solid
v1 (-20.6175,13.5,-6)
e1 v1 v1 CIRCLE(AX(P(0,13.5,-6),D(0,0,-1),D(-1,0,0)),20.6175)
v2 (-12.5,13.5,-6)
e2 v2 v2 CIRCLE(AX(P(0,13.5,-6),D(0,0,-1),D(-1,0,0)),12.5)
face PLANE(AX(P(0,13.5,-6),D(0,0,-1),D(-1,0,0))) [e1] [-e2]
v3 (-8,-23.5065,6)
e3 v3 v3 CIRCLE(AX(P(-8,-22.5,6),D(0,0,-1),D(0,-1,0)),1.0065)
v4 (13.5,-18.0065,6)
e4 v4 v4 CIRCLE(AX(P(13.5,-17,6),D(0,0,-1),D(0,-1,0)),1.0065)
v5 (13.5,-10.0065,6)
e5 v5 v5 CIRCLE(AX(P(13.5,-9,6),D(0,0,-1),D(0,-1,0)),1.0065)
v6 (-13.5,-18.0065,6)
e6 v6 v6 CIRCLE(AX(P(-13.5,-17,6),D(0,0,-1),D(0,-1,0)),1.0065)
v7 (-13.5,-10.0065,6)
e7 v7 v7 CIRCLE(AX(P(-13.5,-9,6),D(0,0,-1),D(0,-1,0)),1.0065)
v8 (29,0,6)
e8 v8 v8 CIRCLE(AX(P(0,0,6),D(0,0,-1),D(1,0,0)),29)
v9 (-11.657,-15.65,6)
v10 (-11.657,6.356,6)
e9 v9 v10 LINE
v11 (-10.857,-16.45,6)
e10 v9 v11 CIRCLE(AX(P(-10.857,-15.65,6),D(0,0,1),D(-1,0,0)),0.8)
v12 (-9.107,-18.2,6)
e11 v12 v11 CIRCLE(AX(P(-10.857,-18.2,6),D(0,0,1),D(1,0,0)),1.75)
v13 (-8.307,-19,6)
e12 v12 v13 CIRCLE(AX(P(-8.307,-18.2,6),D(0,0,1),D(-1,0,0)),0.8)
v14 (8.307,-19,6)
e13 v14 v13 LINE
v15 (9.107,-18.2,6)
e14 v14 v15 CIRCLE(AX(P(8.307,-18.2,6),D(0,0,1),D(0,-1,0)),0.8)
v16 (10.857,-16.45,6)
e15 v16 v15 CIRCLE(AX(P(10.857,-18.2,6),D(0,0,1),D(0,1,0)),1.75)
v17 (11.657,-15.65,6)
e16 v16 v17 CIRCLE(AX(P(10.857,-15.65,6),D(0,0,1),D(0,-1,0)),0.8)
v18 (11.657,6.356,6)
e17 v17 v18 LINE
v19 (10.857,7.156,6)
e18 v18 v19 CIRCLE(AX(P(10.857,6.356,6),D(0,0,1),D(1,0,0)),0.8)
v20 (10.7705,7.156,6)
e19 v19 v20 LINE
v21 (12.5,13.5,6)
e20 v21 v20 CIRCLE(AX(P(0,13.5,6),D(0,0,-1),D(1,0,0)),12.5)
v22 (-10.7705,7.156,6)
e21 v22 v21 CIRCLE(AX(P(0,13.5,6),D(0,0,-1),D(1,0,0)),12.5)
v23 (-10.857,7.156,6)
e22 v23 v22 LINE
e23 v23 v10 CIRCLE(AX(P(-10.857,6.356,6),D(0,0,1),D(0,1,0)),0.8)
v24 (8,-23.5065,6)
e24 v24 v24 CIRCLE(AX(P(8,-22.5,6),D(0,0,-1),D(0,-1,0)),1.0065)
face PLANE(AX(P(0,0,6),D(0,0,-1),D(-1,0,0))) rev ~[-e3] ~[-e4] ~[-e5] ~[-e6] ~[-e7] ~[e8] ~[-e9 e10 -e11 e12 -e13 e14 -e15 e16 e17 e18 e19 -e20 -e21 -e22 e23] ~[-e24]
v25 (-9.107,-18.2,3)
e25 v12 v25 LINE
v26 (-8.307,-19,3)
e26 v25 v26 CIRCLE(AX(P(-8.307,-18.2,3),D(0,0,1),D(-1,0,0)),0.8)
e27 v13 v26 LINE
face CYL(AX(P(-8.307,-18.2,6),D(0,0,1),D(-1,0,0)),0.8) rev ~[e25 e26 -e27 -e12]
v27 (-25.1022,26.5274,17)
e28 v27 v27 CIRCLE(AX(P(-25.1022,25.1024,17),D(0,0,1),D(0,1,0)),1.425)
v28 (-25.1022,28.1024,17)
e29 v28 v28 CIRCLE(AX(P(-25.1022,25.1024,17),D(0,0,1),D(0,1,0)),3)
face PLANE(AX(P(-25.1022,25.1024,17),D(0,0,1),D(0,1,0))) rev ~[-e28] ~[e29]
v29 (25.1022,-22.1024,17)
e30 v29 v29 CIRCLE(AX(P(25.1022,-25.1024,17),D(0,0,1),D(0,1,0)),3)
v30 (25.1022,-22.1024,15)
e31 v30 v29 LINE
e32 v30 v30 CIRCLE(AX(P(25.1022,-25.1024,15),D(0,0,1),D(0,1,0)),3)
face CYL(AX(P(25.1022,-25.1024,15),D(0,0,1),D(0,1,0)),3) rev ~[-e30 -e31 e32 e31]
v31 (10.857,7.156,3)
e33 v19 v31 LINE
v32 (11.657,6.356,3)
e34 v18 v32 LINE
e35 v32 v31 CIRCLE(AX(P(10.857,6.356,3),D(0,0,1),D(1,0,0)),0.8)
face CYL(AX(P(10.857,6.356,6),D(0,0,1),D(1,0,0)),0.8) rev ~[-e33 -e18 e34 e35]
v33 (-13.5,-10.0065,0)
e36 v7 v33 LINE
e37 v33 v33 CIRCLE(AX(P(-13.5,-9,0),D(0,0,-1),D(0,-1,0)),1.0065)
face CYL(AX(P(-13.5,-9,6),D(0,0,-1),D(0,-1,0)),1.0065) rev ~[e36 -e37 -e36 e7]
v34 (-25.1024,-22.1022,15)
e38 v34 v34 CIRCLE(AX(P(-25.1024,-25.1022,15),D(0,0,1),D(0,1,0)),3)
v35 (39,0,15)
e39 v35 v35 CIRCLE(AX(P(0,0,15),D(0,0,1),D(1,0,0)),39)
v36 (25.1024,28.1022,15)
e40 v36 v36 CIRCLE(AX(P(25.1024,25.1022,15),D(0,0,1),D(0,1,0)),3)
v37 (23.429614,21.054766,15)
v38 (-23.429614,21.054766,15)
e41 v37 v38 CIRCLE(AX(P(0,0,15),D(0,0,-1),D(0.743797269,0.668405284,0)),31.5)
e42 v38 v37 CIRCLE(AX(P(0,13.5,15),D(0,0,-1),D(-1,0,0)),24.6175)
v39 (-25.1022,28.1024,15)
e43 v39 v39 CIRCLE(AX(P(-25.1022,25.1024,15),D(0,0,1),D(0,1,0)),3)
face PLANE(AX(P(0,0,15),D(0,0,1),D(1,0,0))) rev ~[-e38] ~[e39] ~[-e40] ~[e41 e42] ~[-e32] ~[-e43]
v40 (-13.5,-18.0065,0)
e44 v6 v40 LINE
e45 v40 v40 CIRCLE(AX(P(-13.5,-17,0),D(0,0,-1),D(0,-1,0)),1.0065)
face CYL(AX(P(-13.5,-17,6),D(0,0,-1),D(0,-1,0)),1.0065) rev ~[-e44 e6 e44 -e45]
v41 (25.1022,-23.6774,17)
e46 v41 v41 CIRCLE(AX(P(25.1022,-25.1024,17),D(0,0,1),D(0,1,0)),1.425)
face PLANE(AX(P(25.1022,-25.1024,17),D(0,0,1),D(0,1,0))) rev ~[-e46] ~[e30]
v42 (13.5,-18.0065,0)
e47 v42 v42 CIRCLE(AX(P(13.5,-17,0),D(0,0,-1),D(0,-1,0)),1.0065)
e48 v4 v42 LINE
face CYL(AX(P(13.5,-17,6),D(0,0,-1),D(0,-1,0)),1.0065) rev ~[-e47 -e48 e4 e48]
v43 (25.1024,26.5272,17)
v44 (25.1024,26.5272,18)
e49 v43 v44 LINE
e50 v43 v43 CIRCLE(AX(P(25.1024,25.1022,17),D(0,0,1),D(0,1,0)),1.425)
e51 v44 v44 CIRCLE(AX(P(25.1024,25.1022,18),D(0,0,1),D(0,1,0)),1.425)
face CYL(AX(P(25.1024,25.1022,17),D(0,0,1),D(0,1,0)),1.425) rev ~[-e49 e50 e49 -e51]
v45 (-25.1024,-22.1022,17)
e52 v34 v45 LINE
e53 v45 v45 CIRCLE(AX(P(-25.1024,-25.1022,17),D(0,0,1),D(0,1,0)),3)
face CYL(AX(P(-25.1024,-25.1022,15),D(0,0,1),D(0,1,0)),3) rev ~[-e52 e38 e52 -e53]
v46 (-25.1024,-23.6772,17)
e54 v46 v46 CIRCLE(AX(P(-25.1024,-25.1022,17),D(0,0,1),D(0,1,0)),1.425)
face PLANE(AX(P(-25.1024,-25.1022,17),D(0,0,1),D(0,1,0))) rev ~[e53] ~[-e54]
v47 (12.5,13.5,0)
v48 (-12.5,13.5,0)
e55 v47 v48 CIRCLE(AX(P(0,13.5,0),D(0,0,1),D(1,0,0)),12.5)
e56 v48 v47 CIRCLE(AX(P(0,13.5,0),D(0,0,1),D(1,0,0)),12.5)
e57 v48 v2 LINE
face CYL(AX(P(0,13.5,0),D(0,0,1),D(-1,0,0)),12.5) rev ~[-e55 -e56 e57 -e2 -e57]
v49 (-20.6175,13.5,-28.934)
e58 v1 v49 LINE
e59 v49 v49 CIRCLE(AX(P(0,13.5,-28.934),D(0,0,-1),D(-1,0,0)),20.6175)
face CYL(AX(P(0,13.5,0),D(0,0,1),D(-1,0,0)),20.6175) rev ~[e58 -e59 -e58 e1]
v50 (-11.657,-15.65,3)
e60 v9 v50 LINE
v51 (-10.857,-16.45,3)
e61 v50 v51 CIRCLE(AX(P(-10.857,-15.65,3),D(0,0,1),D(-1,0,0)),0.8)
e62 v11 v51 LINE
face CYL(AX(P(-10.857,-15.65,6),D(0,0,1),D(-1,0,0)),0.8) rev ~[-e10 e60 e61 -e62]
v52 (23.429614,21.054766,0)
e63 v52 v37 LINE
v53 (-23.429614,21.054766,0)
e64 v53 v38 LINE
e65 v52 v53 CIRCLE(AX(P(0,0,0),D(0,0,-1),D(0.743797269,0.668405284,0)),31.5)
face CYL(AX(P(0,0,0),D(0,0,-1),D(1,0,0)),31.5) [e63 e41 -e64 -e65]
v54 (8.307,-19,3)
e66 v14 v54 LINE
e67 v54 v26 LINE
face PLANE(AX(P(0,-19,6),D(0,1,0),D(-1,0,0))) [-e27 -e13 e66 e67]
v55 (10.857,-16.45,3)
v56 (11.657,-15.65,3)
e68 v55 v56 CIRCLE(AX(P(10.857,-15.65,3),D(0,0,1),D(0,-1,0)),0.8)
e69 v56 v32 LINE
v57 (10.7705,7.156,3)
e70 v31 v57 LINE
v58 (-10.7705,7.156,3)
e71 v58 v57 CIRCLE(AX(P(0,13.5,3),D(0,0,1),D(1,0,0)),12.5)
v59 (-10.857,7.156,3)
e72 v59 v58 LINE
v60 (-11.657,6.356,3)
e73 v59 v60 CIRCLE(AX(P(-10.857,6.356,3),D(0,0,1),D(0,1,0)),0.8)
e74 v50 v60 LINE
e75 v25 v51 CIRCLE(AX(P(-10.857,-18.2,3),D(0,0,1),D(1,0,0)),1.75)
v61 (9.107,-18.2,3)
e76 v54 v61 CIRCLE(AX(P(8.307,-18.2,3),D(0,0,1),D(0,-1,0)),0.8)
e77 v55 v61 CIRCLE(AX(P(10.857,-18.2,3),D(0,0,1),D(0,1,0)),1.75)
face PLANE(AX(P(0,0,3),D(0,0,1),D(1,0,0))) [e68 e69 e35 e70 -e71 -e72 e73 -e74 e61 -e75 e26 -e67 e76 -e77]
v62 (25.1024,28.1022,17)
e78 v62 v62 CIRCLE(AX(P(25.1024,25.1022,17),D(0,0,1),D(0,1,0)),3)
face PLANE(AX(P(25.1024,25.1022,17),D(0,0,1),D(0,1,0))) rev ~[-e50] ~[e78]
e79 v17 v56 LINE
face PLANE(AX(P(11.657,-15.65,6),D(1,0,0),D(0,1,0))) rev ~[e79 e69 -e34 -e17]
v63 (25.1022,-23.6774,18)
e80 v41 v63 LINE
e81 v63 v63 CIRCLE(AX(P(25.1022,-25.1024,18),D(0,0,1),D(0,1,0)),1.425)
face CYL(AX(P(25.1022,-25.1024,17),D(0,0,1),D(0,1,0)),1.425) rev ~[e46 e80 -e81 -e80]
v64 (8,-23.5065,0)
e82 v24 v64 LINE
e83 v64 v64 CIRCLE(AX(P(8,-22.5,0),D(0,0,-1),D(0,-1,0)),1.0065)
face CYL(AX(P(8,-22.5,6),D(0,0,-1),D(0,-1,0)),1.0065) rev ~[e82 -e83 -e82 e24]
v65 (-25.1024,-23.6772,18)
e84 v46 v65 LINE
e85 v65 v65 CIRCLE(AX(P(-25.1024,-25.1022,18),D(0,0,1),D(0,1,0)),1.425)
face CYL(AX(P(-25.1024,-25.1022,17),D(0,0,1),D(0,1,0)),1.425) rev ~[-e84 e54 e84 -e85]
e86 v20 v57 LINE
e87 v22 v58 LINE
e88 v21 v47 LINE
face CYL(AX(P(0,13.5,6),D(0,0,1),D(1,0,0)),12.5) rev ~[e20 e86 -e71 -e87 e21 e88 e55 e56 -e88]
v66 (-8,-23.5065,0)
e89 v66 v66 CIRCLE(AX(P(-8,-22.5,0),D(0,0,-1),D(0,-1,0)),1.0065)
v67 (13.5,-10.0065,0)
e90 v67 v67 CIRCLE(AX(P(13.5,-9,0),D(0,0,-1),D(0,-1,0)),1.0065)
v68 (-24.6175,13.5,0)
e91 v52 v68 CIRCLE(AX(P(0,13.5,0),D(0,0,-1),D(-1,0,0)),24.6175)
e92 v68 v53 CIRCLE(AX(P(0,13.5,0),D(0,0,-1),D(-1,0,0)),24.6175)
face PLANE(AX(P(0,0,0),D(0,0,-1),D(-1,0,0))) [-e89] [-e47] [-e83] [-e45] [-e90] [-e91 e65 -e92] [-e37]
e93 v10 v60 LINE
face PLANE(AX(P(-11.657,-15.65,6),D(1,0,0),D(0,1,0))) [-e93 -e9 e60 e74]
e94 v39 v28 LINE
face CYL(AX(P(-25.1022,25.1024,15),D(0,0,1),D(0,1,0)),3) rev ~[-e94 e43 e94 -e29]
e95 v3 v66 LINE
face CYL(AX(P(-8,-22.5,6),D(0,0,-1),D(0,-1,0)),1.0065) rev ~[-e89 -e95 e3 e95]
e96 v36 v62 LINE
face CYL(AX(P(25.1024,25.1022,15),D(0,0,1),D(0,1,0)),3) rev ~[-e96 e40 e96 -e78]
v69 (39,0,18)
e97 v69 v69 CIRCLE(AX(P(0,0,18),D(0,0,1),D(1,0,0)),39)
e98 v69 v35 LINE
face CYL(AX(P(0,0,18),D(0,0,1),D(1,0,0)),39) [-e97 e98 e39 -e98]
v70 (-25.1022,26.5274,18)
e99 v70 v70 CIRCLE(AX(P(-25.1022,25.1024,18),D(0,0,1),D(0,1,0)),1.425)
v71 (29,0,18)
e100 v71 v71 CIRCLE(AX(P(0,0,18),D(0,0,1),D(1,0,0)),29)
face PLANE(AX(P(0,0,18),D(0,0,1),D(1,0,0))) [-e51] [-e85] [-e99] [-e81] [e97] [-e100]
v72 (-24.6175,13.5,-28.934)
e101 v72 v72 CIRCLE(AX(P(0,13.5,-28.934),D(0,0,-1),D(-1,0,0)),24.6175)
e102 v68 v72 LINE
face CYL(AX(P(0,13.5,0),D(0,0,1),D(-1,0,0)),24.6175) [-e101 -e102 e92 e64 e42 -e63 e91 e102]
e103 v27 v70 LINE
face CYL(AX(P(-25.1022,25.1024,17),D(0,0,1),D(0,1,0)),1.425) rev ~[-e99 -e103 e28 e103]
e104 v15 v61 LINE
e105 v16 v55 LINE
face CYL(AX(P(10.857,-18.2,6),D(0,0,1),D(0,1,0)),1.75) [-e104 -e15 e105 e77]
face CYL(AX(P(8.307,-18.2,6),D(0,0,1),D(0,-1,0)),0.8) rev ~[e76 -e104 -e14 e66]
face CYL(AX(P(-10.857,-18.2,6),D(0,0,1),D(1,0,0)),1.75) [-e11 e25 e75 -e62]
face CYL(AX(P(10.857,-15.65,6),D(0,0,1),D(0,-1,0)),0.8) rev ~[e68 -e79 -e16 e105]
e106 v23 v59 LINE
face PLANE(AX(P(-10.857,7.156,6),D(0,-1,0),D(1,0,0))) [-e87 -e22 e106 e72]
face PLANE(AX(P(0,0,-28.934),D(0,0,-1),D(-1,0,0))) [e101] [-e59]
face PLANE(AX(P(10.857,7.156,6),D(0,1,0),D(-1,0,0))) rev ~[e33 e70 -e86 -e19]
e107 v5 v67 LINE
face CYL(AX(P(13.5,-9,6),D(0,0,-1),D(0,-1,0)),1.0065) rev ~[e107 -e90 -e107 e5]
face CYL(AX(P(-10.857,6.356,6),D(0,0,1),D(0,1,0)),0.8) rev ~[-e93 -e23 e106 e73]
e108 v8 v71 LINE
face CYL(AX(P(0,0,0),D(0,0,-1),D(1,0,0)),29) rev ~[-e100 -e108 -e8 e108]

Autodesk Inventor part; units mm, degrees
ref_plane "YZ Plane" through (0, 0, 0) normal (1, 0, 0) x (0, 1, 0)
ref_plane "XZ Plane" through (0, 0, 0) normal (0, 1, 0) x (-1, 0, 0)
ref_plane "XY Plane" through (0, 0, 0) normal (0, 0, 1) x (1, 0, 0)
sketch "Boceto1" plane through (0, 0, 0) normal (0, 0, 1) x (1, 0, 0)
  circle A0 centre (0, 0) radius 39
  circle A1 centre (0, 0) radius 29
  circle A2 centre (0, 0) radius 31.5
  dimension "DiametroExterior" = 78
  dimension "DiametroCaja" = 58
  dimension "d2" = 63
extrude "Extrusión1" add sketch "Boceto1" along normal blind 18 contours A2
sketch "Boceto2" plane through (0, 0, 18) normal (0, 0, 1) x (1, 0, 0)
  circle A0 centre (0, 0) radius 39
  circle A1 centre (0, 0) radius 31
  dimension "d5" = 78
  dimension "d6" = 62
extrude "Extrusión2" add sketch "Boceto2" against normal blind 3
sketch "Boceto3" plane through (0, 0, 0) normal (0, 0, -1) x (-1, 0, 0)
  circle A0 centre (0, 0) radius 29
  dimension "d9" = 58
extrude "Extrusión3" add sketch "Boceto3" against normal blind 6
sketch "Boceto5" plane through (0, 0, 15) normal (0, 0, -1) x (-1, 0, 0)
  line L0 (0, 0) -> (33, 0) construction
  line L1 (0, 0) -> (33.75, 0) construction
  circle A0 centre (0, 0) radius 39
  circle A1 centre (0, 0) radius 31.5
  circle A2 centre (25.1022, 25.1024) radius 2
  circle A3 centre (25.1024, -25.1022) radius 2
  circle A4 centre (-25.1022, -25.1024) radius 2
  circle A5 centre (-25.1024, 25.1022) radius 2
  point P0 (23.8649, 23.8649)
  dimension "d14" = 33.75
  dimension "d81" = 78
  dimension "d82" = 63
  dimension "d83" = 4
  dimension "d84" = 2
  dimension "d85" = 1.5
  dimension "d86" = 360
sketch "Boceto6" plane through (0, 0, 6) normal (0, 0, 1) x (1, 0, 0)
  line L0 (-16, -25) -> (16, -25)
  line L1 (16, -25) -> (16, 25)
  line L2 (16, 25) -> (-16, 25)
  line L3 (-16, 25) -> (-16, -25)
  line L4 (-16, -25) -> (16, 25) construction
  line L5 (16, -25) -> (-16, 25) construction
  circle A0 centre (0, 13.5) radius 12.5
  circle A1 centre (-8, -22.5) radius 1.1
  circle A2 centre (8, -22.5) radius 1.1
  circle A3 centre (13.5, -17) radius 1.1
  circle A4 centre (-13.5, -17) radius 1.1
  circle A5 centre (-13.5, -9) radius 1.1
  circle A6 centre (-13.5, -1) radius 1.1
  circle A7 centre (-13.5, 7) radius 1.1
  circle A8 centre (13.5, 7) radius 1.1
  circle A9 centre (13.5, -1) radius 1.1
  circle A10 centre (13.5, -9) radius 1.1
  line L6 (0, -25) -> (0, -19)
  line L7 (0, -19) -> (-8.307, -19)
  line L8 (0, -19) -> (8.307, -19)
  line L9 (-11.657, -15.65) -> (-11.657, 6.356)
  line L10 (11.657, -15.65) -> (11.657, 6.356)
  line L11 (10.857, 7.156) -> (9.815, 7.156)
  line L12 (-10.857, 7.156) -> (-9.815, 7.156)
  arc A11 (-9.015, 6.356) -> (9.015, 6.356) centre (0, 13.002) ccw
  arc A12 (9.815, 7.156) -> (9.015, 6.356) centre (9.815, 6.356) ccw
  arc A13 (11.657, 6.356) -> (10.857, 7.156) centre (10.857, 6.356) ccw
  arc A14 (-9.015, 6.356) -> (-9.815, 7.156) centre (-9.815, 6.356) ccw
  arc A15 (-10.857, 7.156) -> (-11.657, 6.356) centre (-10.857, 6.356) ccw
  arc A16 (10.857, -16.45) -> (11.657, -15.65) centre (10.857, -15.65) ccw
  arc A17 (10.857, -16.45) -> (9.107, -18.2) centre (10.857, -18.2) ccw
  arc A18 (8.307, -19) -> (9.107, -18.2) centre (8.307, -18.2) ccw
  arc A19 (-9.107, -18.2) -> (-8.307, -19) centre (-8.307, -18.2) ccw
  arc A20 (-9.107, -18.2) -> (-10.857, -16.45) centre (-10.857, -18.2) ccw
  arc A21 (-11.657, -15.65) -> (-10.857, -16.45) centre (-10.857, -15.65) ccw
  point P0 (0, 0)
  point P1 (0, 0)
  point P2 (10.7705, 7.156)
  point P3 (-10.7705, 7.156)
  point P4 (4.899, 25)
  point P5 (-4.899, 25)
  dimension "d27" = 32
  dimension "d28" = 50
  dimension "d29" = 25
  dimension "d30" = 11.5
  dimension "d31" = 2.2
  dimension "d32" = 2.2
  dimension "d33" = 2.2
  dimension "d34" = 2.2
  dimension "d35" = 2.2
  dimension "d36" = 2.2
  dimension "d37" = 2.2
  dimension "d38" = 2.2
  dimension "d39" = 2.2
  dimension "d40" = 2.2
  dimension "d41" = 27
  dimension "d42" = 16
  dimension "d43" = 36
  dimension "d44" = 30.5
  dimension "d45" = 6.5
  dimension "d46" = 8
  dimension "d47" = 8
  dimension "d48" = 8
  dimension "d49" = 8
  dimension "d50" = 8
  dimension "d51" = 8
  dimension "d52" = 6
  dimension "d53" = 8.307
  dimension "d54" = 22.006
  dimension "d55" = 1.042
  dimension "d56" = 1.042
  dimension "d57" = 11.2
  dimension "d58" = 0.8
  dimension "d59" = 0.8
  dimension "d60" = 0.8
  dimension "d61" = 0.8
  dimension "d62" = 1.75
  dimension "d63" = 0.8
  dimension "d64" = 1.75
  dimension "d65" = 0.8
extrude "Extrusión4" cut sketch "Boceto6" against normal blind 3 contours L7 A19 A20 A21 L9 A15 L12 A0 L11 A13 L10 A16 A17 A18 L8
hole "Agujero2" at (13.5, -17, 6) at (13.5, -9, 6) at (8, -22.5, 6) at (-8, -22.5, 6) at (-13.5, -9, 6) at (-13.5, -17, 6) direction (0, 0, -1) diameter 2.013 depth 7.6 thread size "M2.5x0.45" class "6H" standard "ISO Metric profile"
extrude "Extrusión6" cut sketch "Boceto6" against normal blind 6 contours A0 L2 | L2 A0 L11 A12 A11 A14 L12 | L12 A14 A11 A12 L11 A0
hole "Agujero3" at (-25.1022, 25.1024, 15) at (25.1024, 25.1022, 15) at (25.1022, -25.1024, 15) at (-25.1024, -25.1022, 15) direction (0, 0, 1) diameter 2.85 depth 10.4 counterbore diameter 6 counterbore depth 2 thread size "M3.5x0.6" class "6H" standard "ISO Metric profile"
sketch "Boceto7" plane through (0, 0, 0) normal (0, 0, -1) x (-1, 0, 0)
  arc A0 (-10.7705, 7.156) -> (10.7705, 7.156) centre (0, 13.5) ccw projected
  line L0 (0, 26) -> (0, 13.5)
  circle A1 centre (0, 13.5) radius 20.6175
  circle A2 centre (0, 13.5) radius 24.6175
  point P0 (0, 0)
  dimension "DiametroRodamiento" = 41.235
  dimension "d97" = 49.235
extrude "Extrusión7" add sketch "Boceto7" along normal blind 28.934
sketch "Boceto8" plane through (0, 0, 0) normal (0, 0, -1) x (-1, 0, 0)
  circle A0 centre (0, 0) radius 31.5 projected
  circle A1 centre (0, 0) radius 31.5
  circle A2 centre (0, 13.5) radius 24.6175
  circle A3 centre (0, 13.5) radius 20.6175
  point P0 (23.4296, 21.0548)
  point P1 (-23.4296, 21.0548)
extrude "Extrusión8" add sketch "Boceto8" against normal blind 15 contours A0 A3 A2 | A0 A3 picked at (0.7908, 36.6312) picked at (3.3504, 32.0101)
sketch "Boceto9" plane through (0, 13.5, 0) normal (0, 0, -1) x (-1, 0, 0)
  circle A0 centre (0, 0) radius 12.5
  circle A1 centre (0, 0) radius 20.6175
  point P0 (0, -13.5)
extrude "Extrusión9" add sketch "Boceto9" along normal blind 6
equation "\"d5\" = DiametroExterior"
equation "\"d9\" = DiametroCaja"
equation "\"d83\" = d87"
equation "\"d31\" = d37"
equation "\"d32\" = d37"
equation "\"d33\" = d37"
equation "\"d35\" = d37"
equation "\"d36\" = d37"
equation "\"d38\" = d37"
equation "\"d39\" = d37"
equation "\"d40\" = d37"
equation "\"d47\" = d46"
equation "\"d48\" = d46"
equation "\"d49\" = d46"
equation "\"d50\" = d46"
equation "\"d51\" = d46"
equation "\"d87\" = 4"
properties part number "B-03" material "PETG"
